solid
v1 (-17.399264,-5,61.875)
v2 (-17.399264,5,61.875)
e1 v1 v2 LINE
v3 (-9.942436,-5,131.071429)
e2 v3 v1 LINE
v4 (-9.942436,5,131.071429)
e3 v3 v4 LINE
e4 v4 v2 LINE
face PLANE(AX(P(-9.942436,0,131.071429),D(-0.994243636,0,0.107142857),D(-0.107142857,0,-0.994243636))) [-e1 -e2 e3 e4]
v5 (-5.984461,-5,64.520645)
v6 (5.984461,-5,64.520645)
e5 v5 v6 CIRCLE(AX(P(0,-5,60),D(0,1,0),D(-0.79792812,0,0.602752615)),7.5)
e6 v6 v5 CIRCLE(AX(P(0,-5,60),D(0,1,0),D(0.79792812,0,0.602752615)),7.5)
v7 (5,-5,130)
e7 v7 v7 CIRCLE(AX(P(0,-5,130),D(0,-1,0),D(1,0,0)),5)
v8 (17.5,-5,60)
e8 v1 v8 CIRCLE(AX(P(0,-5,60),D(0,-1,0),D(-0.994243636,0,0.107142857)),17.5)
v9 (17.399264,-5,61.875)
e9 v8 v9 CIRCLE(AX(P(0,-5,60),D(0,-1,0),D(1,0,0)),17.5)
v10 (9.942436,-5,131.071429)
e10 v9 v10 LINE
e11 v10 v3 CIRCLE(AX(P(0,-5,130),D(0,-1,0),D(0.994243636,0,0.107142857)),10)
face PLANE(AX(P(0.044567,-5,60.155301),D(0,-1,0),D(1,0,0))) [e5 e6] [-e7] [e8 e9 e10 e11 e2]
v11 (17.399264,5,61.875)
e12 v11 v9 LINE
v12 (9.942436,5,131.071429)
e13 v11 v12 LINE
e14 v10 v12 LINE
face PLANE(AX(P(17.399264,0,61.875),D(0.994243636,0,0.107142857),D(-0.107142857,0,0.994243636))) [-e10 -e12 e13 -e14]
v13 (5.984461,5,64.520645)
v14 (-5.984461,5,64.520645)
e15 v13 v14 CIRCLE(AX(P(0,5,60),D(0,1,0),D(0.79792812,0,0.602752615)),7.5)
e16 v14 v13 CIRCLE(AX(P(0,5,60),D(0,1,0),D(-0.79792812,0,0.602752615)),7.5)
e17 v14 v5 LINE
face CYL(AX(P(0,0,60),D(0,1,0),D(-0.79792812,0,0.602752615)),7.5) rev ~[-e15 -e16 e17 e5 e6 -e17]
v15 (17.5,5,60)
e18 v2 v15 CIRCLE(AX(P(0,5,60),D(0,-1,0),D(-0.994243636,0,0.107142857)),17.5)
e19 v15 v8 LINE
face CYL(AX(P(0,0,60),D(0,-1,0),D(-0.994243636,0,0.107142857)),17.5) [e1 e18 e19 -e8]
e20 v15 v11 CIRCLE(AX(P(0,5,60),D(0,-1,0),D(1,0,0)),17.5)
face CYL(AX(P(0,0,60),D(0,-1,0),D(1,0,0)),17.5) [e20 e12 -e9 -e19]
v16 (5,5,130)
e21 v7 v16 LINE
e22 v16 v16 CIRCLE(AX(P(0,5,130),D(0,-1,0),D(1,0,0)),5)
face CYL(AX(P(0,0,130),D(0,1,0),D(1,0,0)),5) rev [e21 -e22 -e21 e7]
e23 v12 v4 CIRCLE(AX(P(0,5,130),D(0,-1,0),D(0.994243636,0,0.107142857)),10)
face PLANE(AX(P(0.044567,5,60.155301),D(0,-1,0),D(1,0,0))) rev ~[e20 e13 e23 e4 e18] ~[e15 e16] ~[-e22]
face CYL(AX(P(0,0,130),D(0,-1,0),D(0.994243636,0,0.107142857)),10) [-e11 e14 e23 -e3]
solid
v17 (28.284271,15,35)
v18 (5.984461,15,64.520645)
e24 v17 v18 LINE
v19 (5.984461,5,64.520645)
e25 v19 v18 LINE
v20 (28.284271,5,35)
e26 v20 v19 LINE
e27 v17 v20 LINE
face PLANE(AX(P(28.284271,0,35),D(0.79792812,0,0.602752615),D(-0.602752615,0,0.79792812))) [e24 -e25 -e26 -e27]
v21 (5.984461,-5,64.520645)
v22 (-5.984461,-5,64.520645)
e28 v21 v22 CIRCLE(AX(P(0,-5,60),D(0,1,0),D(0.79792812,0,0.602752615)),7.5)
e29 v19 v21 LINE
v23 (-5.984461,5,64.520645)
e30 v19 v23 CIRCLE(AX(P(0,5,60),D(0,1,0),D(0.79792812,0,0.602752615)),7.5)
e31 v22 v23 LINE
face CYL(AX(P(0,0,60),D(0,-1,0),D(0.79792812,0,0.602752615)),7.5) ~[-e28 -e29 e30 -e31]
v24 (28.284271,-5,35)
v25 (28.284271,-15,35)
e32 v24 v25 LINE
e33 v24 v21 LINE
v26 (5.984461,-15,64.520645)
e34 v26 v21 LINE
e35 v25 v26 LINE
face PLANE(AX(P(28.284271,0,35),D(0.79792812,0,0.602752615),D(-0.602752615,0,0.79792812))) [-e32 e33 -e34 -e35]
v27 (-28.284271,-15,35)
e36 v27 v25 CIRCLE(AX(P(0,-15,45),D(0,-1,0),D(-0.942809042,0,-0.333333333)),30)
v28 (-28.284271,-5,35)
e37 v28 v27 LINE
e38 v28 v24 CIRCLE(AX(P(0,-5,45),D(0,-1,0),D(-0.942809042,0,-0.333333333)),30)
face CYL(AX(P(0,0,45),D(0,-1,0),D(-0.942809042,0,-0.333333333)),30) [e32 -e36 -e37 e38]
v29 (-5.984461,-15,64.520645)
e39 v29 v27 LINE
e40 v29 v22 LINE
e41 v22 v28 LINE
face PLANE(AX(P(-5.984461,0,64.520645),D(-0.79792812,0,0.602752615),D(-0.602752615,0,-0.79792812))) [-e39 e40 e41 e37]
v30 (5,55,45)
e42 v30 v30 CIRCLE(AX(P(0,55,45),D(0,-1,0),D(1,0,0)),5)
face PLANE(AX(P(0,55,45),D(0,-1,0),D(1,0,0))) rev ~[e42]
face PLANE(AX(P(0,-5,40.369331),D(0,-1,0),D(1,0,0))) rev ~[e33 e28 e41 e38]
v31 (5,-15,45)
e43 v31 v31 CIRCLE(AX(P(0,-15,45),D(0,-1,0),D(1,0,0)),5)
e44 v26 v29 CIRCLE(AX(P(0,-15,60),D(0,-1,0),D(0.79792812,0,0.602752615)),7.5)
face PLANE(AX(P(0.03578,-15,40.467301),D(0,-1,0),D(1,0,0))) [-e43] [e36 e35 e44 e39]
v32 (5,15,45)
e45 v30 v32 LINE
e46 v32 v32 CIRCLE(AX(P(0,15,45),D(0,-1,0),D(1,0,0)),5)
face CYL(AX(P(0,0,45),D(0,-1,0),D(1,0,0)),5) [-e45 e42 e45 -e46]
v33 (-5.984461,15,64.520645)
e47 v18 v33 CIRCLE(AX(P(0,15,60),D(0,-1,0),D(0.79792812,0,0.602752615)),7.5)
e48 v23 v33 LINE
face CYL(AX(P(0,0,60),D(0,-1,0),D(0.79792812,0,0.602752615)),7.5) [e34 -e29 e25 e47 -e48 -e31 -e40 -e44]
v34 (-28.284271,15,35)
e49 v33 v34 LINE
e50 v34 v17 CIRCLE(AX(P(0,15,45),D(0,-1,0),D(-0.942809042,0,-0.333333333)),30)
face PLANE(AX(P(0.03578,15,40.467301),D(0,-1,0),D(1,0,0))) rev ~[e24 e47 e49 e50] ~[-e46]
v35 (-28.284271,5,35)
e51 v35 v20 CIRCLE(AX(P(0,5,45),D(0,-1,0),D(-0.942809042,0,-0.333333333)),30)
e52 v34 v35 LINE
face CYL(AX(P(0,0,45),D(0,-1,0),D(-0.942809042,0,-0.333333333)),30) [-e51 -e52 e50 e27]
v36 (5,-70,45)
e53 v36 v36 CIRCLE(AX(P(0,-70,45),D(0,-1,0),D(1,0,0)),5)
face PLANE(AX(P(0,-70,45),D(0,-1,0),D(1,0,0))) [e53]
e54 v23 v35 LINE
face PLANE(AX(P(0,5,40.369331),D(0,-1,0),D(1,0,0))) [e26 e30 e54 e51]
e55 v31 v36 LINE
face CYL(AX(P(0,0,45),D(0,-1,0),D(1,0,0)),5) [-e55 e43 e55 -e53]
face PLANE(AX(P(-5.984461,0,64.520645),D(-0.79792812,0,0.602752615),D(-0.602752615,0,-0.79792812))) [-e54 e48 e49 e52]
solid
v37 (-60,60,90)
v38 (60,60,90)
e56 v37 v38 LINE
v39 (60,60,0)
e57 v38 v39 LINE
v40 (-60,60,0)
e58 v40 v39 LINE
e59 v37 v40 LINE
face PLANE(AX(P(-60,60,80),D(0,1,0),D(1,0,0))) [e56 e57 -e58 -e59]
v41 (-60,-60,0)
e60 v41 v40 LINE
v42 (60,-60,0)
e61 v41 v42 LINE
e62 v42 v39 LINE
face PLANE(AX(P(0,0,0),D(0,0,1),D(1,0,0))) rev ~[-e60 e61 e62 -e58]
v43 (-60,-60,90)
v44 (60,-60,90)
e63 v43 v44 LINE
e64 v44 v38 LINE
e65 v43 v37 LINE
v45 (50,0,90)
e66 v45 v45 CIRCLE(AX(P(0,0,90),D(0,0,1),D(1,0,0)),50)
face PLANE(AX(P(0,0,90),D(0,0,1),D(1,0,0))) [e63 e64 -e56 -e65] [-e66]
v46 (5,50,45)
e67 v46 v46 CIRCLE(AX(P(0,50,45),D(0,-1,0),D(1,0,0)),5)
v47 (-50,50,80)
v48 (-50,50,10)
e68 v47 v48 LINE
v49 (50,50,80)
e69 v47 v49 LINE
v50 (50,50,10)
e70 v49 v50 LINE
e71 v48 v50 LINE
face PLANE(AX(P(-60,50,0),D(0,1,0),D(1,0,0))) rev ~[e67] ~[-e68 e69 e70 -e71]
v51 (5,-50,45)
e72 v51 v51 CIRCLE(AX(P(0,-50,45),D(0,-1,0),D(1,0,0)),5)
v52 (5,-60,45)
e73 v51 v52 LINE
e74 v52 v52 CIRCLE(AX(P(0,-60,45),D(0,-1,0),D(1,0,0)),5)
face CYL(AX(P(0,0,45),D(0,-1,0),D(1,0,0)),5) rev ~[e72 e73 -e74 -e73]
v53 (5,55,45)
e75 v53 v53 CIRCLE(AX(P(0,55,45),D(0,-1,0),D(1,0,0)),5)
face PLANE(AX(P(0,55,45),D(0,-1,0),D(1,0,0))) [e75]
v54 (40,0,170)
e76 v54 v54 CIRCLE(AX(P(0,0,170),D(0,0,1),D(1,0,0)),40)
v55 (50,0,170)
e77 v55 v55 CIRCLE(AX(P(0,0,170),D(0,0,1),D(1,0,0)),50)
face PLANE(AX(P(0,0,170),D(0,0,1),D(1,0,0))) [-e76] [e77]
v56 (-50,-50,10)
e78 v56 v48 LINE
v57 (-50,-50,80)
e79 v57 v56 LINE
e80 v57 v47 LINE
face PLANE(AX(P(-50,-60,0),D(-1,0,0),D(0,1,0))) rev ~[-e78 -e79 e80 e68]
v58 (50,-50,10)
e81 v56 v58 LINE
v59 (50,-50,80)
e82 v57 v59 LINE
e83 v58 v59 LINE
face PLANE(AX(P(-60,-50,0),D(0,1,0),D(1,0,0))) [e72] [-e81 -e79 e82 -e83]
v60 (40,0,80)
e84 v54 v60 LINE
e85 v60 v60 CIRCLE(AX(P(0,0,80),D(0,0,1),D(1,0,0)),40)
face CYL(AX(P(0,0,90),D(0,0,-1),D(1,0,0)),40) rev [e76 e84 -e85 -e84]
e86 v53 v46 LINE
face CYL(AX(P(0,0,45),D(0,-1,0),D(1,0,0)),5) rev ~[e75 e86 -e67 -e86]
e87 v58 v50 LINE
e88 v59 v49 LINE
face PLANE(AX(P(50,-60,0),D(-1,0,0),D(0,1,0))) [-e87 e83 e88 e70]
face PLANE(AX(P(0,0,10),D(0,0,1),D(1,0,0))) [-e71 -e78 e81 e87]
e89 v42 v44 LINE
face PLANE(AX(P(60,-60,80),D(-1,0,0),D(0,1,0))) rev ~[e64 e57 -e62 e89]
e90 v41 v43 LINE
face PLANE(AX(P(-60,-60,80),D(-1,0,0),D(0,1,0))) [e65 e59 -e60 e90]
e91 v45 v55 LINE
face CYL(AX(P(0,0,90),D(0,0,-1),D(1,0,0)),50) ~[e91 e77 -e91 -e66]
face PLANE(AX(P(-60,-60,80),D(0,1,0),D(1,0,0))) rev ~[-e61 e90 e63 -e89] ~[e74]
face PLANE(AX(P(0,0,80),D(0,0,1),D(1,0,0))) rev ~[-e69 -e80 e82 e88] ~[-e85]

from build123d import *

# Parameters (mm, degrees)
F0_W          = 120
F0_H          = 120
F1_DEPTH      = 80
F2_T          = -10
F3_R          = 5
F4_DEPTH      = 70
F4_DEPTH_BACK = 55
F7_DEPTH      = 15
F9_DEPTH      = 5
F10_R         = 5
F11_DEPTH     = 5
F12_W         = 120
F12_H         = 120
F12_R         = 40
F13_DEPTH     = 10
F14_R         = 50
F14_R_2       = 40
F15_DEPTH     = 80


with BuildPart() as f1:
    # F0 (on Top) → F1 (new body)
    with BuildSketch(Plane.XY):
        Rectangle(F0_W, F0_H)
    extrude(amount=F1_DEPTH)

    # F2
    f2_openings = [f1.faces().sort_by_distance(p)[0] for p in [
        (0, 0, 80),
    ]]
    offset(amount=F2_T, openings=f2_openings)


with BuildPart() as f4:
    # F3 (on Front) → F4 (new body, two sides)
    with BuildSketch(Plane.XZ) as f4_sk:
        with Locations((0, 45)):
            Circle(F3_R)
    extrude(amount=F4_DEPTH)
    extrude(f4_sk.sketch, amount=-F4_DEPTH_BACK)


with BuildPart() as f1_1:
    add(f1.part)

    # F5: cut F4
    add(f4.part, mode=Mode.SUBTRACT)

    # F12 (on face) → F13 (join)
    with BuildSketch(Plane.XY.offset(80)):
        Rectangle(F12_W, F12_H)
        Circle(F12_R, mode=Mode.SUBTRACT)
    extrude(amount=F13_DEPTH)

    # F14 (on face) → F15 (join)
    with BuildSketch(Plane.XY.offset(90)):
        Circle(F14_R)
        Circle(F14_R_2, mode=Mode.SUBTRACT)
    extrude(amount=F15_DEPTH)


with BuildPart() as f4_1:
    add(f4.part)

    # F6 (on Front) → F7 (join, symmetric)
    with BuildSketch(Plane.XZ):
        with BuildLine():
            Line((-5.9844609002, 64.5206446149), (-28.2842712475, 35))
            ThreePointArc((-28.2842712475, 35), (0, 15), (28.2842712475, 35))
            Line((28.2842712475, 35), (5.9844609002, 64.5206446149))
            ThreePointArc((5.9844609002, 64.5206446149), (7.111028644, 62.3839613303), (7.5, 60))
            ThreePointArc((7.5, 60), (-2.3839613303, 52.888971356), (-5.9844609002, 64.5206446149))
        make_face()
        with BuildLine():
            ThreePointArc((5.9844609002, 64.5206446149), (0, 67.5), (-5.9844609002, 64.5206446149))
            ThreePointArc((-5.9844609002, 64.5206446149), (-2.3839613303, 52.888971356), (7.5, 60))
            ThreePointArc((7.5, 60), (7.111028644, 62.3839613303), (5.9844609002, 64.5206446149))
        make_face()
    extrude(amount=F7_DEPTH, both=True)

    # F8 (on Front) → F9 (cut, symmetric)
    with BuildSketch(Plane.XZ):
        with BuildLine():
            ThreePointArc((-28.2842712475, 35), (0, 15), (28.2842712475, 35))
            Line((28.2842712475, 35), (5.9844609002, 64.5206446149))
            ThreePointArc((5.9844609002, 64.5206446149), (0, 52.5), (-5.9844609002, 64.5206446149))
            Line((-5.9844609002, 64.5206446149), (-28.2842712475, 35))
        make_face()
    extrude(amount=F9_DEPTH, both=True, mode=Mode.SUBTRACT)


with BuildPart() as f11:
    # F10 (on Front) → F11 (new body, symmetric)
    with BuildSketch(Plane.XZ):
        with BuildLine():
            ThreePointArc((-17.3992636338, 61.875), (-0.9388520671, 42.5252022388), (17.5, 60))
            ThreePointArc((17.5, 60), (17.4747977612, 60.9388520671), (17.3992636338, 61.875))
            ThreePointArc((17.3992636338, 61.875), (0, 77.5), (-17.3992636338, 61.875))
        make_face()
        with BuildLine():
            ThreePointArc((-5.9844609002, 64.5206446149), (0, 67.5), (5.9844609002, 64.5206446149))
            ThreePointArc((5.9844609002, 64.5206446149), (0, 52.5), (-5.9844609002, 64.5206446149))
        make_face(mode=Mode.SUBTRACT)
        with BuildLine():
            ThreePointArc((-17.3992636338, 61.875), (0, 77.5), (17.3992636338, 61.875))
            Line((17.3992636338, 61.875), (9.9424363622, 131.0714285714))
            ThreePointArc((9.9424363622, 131.0714285714), (9.9855987207, 130.5364868955), (10, 130))
            ThreePointArc((10, 130), (-0.5364868955, 120.0144012793), (-9.9424363622, 131.0714285714))
            Line((-9.9424363622, 131.0714285714), (-17.3992636338, 61.875))
        make_face()
        with BuildLine():
            ThreePointArc((10, 130), (9.9855987207, 130.5364868955), (9.9424363622, 131.0714285714))
            ThreePointArc((9.9424363622, 131.0714285714), (0, 140), (-9.9424363622, 131.0714285714))
            ThreePointArc((-9.9424363622, 131.0714285714), (-0.5364868955, 120.0144012793), (10, 130))
        make_face()
        with Locations((0, 130)):
            Circle(F10_R, mode=Mode.SUBTRACT)
    extrude(amount=F11_DEPTH, both=True)


solid = Compound([f1_1.part, f4_1.part, f11.part])
